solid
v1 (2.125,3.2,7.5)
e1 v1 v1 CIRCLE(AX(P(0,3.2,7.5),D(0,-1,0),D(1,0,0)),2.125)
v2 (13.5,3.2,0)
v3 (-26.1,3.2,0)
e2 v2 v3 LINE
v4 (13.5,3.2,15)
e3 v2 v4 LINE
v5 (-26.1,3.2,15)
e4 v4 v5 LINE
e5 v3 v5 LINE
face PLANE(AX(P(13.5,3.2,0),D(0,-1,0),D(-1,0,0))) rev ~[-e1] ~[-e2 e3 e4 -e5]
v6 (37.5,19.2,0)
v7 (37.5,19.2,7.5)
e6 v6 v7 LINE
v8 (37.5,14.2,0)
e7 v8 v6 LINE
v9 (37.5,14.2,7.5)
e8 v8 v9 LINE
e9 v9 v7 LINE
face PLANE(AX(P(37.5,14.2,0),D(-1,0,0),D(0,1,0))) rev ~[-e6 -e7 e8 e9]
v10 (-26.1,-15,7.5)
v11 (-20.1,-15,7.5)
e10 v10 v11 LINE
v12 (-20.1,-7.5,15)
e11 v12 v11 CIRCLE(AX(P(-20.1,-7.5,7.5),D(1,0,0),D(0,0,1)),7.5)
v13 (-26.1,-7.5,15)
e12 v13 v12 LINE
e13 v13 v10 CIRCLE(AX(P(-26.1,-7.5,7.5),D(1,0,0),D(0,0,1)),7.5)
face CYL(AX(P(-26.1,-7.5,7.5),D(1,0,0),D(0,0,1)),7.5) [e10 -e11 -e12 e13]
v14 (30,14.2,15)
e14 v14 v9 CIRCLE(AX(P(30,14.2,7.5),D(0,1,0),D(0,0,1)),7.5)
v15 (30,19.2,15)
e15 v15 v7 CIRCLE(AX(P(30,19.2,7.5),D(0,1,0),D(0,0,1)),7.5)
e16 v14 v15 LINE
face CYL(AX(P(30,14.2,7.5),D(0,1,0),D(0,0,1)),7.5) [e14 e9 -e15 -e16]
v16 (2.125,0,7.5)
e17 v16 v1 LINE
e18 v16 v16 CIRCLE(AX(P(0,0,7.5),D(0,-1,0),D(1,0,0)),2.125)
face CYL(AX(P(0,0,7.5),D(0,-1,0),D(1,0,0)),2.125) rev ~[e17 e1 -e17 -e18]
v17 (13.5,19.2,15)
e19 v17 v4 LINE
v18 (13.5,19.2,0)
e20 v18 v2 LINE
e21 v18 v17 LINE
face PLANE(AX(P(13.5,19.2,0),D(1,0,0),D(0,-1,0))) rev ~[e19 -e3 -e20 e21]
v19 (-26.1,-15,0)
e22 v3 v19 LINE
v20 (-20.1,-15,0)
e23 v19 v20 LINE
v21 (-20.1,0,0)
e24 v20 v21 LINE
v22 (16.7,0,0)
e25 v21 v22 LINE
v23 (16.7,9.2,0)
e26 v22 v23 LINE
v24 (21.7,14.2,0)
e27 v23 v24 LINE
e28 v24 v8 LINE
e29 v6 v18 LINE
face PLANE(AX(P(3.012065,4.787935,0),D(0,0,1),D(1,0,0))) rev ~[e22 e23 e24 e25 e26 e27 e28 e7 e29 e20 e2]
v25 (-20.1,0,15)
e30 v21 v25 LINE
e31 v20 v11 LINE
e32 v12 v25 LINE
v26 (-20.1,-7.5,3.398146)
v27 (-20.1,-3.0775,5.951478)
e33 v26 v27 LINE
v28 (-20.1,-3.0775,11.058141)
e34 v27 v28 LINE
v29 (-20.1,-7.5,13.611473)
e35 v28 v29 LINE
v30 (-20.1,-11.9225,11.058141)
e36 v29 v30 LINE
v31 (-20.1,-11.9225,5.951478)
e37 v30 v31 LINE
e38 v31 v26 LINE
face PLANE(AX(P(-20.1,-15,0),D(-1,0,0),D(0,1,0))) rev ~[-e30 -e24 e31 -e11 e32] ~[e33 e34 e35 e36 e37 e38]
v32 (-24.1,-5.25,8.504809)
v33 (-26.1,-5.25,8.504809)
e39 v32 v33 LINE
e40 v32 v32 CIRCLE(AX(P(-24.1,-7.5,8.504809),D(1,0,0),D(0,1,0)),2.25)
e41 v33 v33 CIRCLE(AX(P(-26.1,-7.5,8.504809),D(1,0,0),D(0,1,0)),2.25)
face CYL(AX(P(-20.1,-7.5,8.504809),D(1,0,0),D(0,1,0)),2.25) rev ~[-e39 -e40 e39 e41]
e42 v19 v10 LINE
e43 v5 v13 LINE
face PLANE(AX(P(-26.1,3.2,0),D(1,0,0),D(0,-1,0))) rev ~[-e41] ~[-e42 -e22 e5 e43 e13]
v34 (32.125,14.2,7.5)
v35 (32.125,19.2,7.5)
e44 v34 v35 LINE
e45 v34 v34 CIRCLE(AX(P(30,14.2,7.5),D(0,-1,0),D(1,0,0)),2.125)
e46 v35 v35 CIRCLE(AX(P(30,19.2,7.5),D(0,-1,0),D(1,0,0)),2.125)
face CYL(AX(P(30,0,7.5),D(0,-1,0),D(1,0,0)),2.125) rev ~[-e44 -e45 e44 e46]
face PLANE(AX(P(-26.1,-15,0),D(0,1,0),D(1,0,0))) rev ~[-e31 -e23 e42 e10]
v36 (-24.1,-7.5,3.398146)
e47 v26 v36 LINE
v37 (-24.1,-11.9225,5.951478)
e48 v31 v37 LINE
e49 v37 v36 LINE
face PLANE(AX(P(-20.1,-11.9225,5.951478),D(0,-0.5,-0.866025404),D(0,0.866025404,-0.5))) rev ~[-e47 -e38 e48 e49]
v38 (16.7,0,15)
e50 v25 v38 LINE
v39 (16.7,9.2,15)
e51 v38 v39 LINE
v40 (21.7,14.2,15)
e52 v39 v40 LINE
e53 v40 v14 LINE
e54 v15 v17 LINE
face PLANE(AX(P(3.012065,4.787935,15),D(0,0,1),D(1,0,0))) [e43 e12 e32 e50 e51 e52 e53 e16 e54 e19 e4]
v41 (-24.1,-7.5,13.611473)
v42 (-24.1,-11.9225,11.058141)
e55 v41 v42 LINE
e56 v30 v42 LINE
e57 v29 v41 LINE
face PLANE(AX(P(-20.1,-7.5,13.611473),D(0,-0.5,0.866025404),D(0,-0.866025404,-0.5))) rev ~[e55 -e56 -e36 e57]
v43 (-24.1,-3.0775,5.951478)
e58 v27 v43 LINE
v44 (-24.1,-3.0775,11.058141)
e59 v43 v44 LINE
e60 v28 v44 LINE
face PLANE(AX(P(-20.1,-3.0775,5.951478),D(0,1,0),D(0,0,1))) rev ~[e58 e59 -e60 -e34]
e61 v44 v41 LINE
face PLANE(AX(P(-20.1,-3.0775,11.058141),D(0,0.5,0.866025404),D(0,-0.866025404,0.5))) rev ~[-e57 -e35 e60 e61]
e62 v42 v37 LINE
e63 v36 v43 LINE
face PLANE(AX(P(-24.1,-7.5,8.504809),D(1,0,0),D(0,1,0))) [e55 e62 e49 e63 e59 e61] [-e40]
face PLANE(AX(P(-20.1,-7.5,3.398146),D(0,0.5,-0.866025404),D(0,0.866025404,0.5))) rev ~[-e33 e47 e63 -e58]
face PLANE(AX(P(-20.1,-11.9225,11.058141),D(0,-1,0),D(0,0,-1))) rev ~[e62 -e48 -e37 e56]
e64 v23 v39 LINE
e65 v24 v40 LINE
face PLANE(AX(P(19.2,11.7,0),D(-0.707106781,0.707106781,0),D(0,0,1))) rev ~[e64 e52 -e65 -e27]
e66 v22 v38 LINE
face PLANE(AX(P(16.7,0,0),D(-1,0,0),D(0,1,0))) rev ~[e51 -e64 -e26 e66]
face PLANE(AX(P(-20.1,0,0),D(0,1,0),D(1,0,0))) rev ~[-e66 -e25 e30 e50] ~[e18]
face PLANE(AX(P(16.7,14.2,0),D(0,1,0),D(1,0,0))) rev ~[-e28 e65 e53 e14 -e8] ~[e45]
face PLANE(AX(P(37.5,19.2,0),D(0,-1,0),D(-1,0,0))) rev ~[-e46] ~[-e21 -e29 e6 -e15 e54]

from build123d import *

# Parameters (mm, degrees)
F1_DEPTH = 15
F2_R     = 2.125
F3_DEPTH = 25
F4_SIZE  = 5
F5_R     = 7.5
F6_R     = 2.25
F7_DEPTH = 25
F9_DEPTH = 4


# Not quite as in the source:
# - a feature names something its author has since deleted; it is built from what else it names


with BuildPart() as f1:
    # F0 (on Top) → F1 (new body)
    with BuildSketch(Plane.XY):
        Polygon((-16.7, 0), (0, 0), (16.7, 0), (16.7, 14.2), (37.5, 14.2), (37.5, 19.2), (13.5, 19.2), (13.5, 3.2), (0, 3.2), (-13.5, 3.2), (-26.1, 3.2), (-26.1, -15), (-20.1, -15), (-20.1, 0), align=None)
    extrude(amount=F1_DEPTH)

    # F2 (on face) → F3 (cut)
    with BuildSketch(Plane.XZ):
        with Locations((0, 7.5)):
            Circle(F2_R)
        with Locations((30, 7.5)):
            Circle(F2_R)
    extrude(amount=-F3_DEPTH, mode=Mode.SUBTRACT)

    # F4
    f4_edges = [f1.edges().sort_by_distance(p)[0] for p in [
        (16.7, 14.2, 7.5),
    ]]
    chamfer(f4_edges, length=F4_SIZE)

    # F5
    f5_edges = [f1.edges().sort_by_distance(p)[0] for p in [
        (37.5, 16.7, 15),
        (-23.1, -15, 15),
    ]]
    fillet(f5_edges, radius=F5_R)

    # F6 (on face) → F7 (cut)
    with BuildSketch(Plane.YZ.offset(-20.1)):
        with Locations((-7.5, 8.5048094716)):
            Circle(F6_R)
    extrude(amount=-F7_DEPTH, mode=Mode.SUBTRACT)

    # F8 (on face) → F9 (cut)
    with BuildSketch(Plane.YZ.offset(-20.1)):
        Polygon((-3.0775, 5.9514779061), (-3.0775, 11.0581410371), (-7.5, 13.6114726026), (-11.9225, 11.0581410371), (-11.9225, 5.9514779061), (-7.5, 3.3981463406), align=None)
    extrude(amount=-F9_DEPTH, mode=Mode.SUBTRACT)


solid = f1.part
